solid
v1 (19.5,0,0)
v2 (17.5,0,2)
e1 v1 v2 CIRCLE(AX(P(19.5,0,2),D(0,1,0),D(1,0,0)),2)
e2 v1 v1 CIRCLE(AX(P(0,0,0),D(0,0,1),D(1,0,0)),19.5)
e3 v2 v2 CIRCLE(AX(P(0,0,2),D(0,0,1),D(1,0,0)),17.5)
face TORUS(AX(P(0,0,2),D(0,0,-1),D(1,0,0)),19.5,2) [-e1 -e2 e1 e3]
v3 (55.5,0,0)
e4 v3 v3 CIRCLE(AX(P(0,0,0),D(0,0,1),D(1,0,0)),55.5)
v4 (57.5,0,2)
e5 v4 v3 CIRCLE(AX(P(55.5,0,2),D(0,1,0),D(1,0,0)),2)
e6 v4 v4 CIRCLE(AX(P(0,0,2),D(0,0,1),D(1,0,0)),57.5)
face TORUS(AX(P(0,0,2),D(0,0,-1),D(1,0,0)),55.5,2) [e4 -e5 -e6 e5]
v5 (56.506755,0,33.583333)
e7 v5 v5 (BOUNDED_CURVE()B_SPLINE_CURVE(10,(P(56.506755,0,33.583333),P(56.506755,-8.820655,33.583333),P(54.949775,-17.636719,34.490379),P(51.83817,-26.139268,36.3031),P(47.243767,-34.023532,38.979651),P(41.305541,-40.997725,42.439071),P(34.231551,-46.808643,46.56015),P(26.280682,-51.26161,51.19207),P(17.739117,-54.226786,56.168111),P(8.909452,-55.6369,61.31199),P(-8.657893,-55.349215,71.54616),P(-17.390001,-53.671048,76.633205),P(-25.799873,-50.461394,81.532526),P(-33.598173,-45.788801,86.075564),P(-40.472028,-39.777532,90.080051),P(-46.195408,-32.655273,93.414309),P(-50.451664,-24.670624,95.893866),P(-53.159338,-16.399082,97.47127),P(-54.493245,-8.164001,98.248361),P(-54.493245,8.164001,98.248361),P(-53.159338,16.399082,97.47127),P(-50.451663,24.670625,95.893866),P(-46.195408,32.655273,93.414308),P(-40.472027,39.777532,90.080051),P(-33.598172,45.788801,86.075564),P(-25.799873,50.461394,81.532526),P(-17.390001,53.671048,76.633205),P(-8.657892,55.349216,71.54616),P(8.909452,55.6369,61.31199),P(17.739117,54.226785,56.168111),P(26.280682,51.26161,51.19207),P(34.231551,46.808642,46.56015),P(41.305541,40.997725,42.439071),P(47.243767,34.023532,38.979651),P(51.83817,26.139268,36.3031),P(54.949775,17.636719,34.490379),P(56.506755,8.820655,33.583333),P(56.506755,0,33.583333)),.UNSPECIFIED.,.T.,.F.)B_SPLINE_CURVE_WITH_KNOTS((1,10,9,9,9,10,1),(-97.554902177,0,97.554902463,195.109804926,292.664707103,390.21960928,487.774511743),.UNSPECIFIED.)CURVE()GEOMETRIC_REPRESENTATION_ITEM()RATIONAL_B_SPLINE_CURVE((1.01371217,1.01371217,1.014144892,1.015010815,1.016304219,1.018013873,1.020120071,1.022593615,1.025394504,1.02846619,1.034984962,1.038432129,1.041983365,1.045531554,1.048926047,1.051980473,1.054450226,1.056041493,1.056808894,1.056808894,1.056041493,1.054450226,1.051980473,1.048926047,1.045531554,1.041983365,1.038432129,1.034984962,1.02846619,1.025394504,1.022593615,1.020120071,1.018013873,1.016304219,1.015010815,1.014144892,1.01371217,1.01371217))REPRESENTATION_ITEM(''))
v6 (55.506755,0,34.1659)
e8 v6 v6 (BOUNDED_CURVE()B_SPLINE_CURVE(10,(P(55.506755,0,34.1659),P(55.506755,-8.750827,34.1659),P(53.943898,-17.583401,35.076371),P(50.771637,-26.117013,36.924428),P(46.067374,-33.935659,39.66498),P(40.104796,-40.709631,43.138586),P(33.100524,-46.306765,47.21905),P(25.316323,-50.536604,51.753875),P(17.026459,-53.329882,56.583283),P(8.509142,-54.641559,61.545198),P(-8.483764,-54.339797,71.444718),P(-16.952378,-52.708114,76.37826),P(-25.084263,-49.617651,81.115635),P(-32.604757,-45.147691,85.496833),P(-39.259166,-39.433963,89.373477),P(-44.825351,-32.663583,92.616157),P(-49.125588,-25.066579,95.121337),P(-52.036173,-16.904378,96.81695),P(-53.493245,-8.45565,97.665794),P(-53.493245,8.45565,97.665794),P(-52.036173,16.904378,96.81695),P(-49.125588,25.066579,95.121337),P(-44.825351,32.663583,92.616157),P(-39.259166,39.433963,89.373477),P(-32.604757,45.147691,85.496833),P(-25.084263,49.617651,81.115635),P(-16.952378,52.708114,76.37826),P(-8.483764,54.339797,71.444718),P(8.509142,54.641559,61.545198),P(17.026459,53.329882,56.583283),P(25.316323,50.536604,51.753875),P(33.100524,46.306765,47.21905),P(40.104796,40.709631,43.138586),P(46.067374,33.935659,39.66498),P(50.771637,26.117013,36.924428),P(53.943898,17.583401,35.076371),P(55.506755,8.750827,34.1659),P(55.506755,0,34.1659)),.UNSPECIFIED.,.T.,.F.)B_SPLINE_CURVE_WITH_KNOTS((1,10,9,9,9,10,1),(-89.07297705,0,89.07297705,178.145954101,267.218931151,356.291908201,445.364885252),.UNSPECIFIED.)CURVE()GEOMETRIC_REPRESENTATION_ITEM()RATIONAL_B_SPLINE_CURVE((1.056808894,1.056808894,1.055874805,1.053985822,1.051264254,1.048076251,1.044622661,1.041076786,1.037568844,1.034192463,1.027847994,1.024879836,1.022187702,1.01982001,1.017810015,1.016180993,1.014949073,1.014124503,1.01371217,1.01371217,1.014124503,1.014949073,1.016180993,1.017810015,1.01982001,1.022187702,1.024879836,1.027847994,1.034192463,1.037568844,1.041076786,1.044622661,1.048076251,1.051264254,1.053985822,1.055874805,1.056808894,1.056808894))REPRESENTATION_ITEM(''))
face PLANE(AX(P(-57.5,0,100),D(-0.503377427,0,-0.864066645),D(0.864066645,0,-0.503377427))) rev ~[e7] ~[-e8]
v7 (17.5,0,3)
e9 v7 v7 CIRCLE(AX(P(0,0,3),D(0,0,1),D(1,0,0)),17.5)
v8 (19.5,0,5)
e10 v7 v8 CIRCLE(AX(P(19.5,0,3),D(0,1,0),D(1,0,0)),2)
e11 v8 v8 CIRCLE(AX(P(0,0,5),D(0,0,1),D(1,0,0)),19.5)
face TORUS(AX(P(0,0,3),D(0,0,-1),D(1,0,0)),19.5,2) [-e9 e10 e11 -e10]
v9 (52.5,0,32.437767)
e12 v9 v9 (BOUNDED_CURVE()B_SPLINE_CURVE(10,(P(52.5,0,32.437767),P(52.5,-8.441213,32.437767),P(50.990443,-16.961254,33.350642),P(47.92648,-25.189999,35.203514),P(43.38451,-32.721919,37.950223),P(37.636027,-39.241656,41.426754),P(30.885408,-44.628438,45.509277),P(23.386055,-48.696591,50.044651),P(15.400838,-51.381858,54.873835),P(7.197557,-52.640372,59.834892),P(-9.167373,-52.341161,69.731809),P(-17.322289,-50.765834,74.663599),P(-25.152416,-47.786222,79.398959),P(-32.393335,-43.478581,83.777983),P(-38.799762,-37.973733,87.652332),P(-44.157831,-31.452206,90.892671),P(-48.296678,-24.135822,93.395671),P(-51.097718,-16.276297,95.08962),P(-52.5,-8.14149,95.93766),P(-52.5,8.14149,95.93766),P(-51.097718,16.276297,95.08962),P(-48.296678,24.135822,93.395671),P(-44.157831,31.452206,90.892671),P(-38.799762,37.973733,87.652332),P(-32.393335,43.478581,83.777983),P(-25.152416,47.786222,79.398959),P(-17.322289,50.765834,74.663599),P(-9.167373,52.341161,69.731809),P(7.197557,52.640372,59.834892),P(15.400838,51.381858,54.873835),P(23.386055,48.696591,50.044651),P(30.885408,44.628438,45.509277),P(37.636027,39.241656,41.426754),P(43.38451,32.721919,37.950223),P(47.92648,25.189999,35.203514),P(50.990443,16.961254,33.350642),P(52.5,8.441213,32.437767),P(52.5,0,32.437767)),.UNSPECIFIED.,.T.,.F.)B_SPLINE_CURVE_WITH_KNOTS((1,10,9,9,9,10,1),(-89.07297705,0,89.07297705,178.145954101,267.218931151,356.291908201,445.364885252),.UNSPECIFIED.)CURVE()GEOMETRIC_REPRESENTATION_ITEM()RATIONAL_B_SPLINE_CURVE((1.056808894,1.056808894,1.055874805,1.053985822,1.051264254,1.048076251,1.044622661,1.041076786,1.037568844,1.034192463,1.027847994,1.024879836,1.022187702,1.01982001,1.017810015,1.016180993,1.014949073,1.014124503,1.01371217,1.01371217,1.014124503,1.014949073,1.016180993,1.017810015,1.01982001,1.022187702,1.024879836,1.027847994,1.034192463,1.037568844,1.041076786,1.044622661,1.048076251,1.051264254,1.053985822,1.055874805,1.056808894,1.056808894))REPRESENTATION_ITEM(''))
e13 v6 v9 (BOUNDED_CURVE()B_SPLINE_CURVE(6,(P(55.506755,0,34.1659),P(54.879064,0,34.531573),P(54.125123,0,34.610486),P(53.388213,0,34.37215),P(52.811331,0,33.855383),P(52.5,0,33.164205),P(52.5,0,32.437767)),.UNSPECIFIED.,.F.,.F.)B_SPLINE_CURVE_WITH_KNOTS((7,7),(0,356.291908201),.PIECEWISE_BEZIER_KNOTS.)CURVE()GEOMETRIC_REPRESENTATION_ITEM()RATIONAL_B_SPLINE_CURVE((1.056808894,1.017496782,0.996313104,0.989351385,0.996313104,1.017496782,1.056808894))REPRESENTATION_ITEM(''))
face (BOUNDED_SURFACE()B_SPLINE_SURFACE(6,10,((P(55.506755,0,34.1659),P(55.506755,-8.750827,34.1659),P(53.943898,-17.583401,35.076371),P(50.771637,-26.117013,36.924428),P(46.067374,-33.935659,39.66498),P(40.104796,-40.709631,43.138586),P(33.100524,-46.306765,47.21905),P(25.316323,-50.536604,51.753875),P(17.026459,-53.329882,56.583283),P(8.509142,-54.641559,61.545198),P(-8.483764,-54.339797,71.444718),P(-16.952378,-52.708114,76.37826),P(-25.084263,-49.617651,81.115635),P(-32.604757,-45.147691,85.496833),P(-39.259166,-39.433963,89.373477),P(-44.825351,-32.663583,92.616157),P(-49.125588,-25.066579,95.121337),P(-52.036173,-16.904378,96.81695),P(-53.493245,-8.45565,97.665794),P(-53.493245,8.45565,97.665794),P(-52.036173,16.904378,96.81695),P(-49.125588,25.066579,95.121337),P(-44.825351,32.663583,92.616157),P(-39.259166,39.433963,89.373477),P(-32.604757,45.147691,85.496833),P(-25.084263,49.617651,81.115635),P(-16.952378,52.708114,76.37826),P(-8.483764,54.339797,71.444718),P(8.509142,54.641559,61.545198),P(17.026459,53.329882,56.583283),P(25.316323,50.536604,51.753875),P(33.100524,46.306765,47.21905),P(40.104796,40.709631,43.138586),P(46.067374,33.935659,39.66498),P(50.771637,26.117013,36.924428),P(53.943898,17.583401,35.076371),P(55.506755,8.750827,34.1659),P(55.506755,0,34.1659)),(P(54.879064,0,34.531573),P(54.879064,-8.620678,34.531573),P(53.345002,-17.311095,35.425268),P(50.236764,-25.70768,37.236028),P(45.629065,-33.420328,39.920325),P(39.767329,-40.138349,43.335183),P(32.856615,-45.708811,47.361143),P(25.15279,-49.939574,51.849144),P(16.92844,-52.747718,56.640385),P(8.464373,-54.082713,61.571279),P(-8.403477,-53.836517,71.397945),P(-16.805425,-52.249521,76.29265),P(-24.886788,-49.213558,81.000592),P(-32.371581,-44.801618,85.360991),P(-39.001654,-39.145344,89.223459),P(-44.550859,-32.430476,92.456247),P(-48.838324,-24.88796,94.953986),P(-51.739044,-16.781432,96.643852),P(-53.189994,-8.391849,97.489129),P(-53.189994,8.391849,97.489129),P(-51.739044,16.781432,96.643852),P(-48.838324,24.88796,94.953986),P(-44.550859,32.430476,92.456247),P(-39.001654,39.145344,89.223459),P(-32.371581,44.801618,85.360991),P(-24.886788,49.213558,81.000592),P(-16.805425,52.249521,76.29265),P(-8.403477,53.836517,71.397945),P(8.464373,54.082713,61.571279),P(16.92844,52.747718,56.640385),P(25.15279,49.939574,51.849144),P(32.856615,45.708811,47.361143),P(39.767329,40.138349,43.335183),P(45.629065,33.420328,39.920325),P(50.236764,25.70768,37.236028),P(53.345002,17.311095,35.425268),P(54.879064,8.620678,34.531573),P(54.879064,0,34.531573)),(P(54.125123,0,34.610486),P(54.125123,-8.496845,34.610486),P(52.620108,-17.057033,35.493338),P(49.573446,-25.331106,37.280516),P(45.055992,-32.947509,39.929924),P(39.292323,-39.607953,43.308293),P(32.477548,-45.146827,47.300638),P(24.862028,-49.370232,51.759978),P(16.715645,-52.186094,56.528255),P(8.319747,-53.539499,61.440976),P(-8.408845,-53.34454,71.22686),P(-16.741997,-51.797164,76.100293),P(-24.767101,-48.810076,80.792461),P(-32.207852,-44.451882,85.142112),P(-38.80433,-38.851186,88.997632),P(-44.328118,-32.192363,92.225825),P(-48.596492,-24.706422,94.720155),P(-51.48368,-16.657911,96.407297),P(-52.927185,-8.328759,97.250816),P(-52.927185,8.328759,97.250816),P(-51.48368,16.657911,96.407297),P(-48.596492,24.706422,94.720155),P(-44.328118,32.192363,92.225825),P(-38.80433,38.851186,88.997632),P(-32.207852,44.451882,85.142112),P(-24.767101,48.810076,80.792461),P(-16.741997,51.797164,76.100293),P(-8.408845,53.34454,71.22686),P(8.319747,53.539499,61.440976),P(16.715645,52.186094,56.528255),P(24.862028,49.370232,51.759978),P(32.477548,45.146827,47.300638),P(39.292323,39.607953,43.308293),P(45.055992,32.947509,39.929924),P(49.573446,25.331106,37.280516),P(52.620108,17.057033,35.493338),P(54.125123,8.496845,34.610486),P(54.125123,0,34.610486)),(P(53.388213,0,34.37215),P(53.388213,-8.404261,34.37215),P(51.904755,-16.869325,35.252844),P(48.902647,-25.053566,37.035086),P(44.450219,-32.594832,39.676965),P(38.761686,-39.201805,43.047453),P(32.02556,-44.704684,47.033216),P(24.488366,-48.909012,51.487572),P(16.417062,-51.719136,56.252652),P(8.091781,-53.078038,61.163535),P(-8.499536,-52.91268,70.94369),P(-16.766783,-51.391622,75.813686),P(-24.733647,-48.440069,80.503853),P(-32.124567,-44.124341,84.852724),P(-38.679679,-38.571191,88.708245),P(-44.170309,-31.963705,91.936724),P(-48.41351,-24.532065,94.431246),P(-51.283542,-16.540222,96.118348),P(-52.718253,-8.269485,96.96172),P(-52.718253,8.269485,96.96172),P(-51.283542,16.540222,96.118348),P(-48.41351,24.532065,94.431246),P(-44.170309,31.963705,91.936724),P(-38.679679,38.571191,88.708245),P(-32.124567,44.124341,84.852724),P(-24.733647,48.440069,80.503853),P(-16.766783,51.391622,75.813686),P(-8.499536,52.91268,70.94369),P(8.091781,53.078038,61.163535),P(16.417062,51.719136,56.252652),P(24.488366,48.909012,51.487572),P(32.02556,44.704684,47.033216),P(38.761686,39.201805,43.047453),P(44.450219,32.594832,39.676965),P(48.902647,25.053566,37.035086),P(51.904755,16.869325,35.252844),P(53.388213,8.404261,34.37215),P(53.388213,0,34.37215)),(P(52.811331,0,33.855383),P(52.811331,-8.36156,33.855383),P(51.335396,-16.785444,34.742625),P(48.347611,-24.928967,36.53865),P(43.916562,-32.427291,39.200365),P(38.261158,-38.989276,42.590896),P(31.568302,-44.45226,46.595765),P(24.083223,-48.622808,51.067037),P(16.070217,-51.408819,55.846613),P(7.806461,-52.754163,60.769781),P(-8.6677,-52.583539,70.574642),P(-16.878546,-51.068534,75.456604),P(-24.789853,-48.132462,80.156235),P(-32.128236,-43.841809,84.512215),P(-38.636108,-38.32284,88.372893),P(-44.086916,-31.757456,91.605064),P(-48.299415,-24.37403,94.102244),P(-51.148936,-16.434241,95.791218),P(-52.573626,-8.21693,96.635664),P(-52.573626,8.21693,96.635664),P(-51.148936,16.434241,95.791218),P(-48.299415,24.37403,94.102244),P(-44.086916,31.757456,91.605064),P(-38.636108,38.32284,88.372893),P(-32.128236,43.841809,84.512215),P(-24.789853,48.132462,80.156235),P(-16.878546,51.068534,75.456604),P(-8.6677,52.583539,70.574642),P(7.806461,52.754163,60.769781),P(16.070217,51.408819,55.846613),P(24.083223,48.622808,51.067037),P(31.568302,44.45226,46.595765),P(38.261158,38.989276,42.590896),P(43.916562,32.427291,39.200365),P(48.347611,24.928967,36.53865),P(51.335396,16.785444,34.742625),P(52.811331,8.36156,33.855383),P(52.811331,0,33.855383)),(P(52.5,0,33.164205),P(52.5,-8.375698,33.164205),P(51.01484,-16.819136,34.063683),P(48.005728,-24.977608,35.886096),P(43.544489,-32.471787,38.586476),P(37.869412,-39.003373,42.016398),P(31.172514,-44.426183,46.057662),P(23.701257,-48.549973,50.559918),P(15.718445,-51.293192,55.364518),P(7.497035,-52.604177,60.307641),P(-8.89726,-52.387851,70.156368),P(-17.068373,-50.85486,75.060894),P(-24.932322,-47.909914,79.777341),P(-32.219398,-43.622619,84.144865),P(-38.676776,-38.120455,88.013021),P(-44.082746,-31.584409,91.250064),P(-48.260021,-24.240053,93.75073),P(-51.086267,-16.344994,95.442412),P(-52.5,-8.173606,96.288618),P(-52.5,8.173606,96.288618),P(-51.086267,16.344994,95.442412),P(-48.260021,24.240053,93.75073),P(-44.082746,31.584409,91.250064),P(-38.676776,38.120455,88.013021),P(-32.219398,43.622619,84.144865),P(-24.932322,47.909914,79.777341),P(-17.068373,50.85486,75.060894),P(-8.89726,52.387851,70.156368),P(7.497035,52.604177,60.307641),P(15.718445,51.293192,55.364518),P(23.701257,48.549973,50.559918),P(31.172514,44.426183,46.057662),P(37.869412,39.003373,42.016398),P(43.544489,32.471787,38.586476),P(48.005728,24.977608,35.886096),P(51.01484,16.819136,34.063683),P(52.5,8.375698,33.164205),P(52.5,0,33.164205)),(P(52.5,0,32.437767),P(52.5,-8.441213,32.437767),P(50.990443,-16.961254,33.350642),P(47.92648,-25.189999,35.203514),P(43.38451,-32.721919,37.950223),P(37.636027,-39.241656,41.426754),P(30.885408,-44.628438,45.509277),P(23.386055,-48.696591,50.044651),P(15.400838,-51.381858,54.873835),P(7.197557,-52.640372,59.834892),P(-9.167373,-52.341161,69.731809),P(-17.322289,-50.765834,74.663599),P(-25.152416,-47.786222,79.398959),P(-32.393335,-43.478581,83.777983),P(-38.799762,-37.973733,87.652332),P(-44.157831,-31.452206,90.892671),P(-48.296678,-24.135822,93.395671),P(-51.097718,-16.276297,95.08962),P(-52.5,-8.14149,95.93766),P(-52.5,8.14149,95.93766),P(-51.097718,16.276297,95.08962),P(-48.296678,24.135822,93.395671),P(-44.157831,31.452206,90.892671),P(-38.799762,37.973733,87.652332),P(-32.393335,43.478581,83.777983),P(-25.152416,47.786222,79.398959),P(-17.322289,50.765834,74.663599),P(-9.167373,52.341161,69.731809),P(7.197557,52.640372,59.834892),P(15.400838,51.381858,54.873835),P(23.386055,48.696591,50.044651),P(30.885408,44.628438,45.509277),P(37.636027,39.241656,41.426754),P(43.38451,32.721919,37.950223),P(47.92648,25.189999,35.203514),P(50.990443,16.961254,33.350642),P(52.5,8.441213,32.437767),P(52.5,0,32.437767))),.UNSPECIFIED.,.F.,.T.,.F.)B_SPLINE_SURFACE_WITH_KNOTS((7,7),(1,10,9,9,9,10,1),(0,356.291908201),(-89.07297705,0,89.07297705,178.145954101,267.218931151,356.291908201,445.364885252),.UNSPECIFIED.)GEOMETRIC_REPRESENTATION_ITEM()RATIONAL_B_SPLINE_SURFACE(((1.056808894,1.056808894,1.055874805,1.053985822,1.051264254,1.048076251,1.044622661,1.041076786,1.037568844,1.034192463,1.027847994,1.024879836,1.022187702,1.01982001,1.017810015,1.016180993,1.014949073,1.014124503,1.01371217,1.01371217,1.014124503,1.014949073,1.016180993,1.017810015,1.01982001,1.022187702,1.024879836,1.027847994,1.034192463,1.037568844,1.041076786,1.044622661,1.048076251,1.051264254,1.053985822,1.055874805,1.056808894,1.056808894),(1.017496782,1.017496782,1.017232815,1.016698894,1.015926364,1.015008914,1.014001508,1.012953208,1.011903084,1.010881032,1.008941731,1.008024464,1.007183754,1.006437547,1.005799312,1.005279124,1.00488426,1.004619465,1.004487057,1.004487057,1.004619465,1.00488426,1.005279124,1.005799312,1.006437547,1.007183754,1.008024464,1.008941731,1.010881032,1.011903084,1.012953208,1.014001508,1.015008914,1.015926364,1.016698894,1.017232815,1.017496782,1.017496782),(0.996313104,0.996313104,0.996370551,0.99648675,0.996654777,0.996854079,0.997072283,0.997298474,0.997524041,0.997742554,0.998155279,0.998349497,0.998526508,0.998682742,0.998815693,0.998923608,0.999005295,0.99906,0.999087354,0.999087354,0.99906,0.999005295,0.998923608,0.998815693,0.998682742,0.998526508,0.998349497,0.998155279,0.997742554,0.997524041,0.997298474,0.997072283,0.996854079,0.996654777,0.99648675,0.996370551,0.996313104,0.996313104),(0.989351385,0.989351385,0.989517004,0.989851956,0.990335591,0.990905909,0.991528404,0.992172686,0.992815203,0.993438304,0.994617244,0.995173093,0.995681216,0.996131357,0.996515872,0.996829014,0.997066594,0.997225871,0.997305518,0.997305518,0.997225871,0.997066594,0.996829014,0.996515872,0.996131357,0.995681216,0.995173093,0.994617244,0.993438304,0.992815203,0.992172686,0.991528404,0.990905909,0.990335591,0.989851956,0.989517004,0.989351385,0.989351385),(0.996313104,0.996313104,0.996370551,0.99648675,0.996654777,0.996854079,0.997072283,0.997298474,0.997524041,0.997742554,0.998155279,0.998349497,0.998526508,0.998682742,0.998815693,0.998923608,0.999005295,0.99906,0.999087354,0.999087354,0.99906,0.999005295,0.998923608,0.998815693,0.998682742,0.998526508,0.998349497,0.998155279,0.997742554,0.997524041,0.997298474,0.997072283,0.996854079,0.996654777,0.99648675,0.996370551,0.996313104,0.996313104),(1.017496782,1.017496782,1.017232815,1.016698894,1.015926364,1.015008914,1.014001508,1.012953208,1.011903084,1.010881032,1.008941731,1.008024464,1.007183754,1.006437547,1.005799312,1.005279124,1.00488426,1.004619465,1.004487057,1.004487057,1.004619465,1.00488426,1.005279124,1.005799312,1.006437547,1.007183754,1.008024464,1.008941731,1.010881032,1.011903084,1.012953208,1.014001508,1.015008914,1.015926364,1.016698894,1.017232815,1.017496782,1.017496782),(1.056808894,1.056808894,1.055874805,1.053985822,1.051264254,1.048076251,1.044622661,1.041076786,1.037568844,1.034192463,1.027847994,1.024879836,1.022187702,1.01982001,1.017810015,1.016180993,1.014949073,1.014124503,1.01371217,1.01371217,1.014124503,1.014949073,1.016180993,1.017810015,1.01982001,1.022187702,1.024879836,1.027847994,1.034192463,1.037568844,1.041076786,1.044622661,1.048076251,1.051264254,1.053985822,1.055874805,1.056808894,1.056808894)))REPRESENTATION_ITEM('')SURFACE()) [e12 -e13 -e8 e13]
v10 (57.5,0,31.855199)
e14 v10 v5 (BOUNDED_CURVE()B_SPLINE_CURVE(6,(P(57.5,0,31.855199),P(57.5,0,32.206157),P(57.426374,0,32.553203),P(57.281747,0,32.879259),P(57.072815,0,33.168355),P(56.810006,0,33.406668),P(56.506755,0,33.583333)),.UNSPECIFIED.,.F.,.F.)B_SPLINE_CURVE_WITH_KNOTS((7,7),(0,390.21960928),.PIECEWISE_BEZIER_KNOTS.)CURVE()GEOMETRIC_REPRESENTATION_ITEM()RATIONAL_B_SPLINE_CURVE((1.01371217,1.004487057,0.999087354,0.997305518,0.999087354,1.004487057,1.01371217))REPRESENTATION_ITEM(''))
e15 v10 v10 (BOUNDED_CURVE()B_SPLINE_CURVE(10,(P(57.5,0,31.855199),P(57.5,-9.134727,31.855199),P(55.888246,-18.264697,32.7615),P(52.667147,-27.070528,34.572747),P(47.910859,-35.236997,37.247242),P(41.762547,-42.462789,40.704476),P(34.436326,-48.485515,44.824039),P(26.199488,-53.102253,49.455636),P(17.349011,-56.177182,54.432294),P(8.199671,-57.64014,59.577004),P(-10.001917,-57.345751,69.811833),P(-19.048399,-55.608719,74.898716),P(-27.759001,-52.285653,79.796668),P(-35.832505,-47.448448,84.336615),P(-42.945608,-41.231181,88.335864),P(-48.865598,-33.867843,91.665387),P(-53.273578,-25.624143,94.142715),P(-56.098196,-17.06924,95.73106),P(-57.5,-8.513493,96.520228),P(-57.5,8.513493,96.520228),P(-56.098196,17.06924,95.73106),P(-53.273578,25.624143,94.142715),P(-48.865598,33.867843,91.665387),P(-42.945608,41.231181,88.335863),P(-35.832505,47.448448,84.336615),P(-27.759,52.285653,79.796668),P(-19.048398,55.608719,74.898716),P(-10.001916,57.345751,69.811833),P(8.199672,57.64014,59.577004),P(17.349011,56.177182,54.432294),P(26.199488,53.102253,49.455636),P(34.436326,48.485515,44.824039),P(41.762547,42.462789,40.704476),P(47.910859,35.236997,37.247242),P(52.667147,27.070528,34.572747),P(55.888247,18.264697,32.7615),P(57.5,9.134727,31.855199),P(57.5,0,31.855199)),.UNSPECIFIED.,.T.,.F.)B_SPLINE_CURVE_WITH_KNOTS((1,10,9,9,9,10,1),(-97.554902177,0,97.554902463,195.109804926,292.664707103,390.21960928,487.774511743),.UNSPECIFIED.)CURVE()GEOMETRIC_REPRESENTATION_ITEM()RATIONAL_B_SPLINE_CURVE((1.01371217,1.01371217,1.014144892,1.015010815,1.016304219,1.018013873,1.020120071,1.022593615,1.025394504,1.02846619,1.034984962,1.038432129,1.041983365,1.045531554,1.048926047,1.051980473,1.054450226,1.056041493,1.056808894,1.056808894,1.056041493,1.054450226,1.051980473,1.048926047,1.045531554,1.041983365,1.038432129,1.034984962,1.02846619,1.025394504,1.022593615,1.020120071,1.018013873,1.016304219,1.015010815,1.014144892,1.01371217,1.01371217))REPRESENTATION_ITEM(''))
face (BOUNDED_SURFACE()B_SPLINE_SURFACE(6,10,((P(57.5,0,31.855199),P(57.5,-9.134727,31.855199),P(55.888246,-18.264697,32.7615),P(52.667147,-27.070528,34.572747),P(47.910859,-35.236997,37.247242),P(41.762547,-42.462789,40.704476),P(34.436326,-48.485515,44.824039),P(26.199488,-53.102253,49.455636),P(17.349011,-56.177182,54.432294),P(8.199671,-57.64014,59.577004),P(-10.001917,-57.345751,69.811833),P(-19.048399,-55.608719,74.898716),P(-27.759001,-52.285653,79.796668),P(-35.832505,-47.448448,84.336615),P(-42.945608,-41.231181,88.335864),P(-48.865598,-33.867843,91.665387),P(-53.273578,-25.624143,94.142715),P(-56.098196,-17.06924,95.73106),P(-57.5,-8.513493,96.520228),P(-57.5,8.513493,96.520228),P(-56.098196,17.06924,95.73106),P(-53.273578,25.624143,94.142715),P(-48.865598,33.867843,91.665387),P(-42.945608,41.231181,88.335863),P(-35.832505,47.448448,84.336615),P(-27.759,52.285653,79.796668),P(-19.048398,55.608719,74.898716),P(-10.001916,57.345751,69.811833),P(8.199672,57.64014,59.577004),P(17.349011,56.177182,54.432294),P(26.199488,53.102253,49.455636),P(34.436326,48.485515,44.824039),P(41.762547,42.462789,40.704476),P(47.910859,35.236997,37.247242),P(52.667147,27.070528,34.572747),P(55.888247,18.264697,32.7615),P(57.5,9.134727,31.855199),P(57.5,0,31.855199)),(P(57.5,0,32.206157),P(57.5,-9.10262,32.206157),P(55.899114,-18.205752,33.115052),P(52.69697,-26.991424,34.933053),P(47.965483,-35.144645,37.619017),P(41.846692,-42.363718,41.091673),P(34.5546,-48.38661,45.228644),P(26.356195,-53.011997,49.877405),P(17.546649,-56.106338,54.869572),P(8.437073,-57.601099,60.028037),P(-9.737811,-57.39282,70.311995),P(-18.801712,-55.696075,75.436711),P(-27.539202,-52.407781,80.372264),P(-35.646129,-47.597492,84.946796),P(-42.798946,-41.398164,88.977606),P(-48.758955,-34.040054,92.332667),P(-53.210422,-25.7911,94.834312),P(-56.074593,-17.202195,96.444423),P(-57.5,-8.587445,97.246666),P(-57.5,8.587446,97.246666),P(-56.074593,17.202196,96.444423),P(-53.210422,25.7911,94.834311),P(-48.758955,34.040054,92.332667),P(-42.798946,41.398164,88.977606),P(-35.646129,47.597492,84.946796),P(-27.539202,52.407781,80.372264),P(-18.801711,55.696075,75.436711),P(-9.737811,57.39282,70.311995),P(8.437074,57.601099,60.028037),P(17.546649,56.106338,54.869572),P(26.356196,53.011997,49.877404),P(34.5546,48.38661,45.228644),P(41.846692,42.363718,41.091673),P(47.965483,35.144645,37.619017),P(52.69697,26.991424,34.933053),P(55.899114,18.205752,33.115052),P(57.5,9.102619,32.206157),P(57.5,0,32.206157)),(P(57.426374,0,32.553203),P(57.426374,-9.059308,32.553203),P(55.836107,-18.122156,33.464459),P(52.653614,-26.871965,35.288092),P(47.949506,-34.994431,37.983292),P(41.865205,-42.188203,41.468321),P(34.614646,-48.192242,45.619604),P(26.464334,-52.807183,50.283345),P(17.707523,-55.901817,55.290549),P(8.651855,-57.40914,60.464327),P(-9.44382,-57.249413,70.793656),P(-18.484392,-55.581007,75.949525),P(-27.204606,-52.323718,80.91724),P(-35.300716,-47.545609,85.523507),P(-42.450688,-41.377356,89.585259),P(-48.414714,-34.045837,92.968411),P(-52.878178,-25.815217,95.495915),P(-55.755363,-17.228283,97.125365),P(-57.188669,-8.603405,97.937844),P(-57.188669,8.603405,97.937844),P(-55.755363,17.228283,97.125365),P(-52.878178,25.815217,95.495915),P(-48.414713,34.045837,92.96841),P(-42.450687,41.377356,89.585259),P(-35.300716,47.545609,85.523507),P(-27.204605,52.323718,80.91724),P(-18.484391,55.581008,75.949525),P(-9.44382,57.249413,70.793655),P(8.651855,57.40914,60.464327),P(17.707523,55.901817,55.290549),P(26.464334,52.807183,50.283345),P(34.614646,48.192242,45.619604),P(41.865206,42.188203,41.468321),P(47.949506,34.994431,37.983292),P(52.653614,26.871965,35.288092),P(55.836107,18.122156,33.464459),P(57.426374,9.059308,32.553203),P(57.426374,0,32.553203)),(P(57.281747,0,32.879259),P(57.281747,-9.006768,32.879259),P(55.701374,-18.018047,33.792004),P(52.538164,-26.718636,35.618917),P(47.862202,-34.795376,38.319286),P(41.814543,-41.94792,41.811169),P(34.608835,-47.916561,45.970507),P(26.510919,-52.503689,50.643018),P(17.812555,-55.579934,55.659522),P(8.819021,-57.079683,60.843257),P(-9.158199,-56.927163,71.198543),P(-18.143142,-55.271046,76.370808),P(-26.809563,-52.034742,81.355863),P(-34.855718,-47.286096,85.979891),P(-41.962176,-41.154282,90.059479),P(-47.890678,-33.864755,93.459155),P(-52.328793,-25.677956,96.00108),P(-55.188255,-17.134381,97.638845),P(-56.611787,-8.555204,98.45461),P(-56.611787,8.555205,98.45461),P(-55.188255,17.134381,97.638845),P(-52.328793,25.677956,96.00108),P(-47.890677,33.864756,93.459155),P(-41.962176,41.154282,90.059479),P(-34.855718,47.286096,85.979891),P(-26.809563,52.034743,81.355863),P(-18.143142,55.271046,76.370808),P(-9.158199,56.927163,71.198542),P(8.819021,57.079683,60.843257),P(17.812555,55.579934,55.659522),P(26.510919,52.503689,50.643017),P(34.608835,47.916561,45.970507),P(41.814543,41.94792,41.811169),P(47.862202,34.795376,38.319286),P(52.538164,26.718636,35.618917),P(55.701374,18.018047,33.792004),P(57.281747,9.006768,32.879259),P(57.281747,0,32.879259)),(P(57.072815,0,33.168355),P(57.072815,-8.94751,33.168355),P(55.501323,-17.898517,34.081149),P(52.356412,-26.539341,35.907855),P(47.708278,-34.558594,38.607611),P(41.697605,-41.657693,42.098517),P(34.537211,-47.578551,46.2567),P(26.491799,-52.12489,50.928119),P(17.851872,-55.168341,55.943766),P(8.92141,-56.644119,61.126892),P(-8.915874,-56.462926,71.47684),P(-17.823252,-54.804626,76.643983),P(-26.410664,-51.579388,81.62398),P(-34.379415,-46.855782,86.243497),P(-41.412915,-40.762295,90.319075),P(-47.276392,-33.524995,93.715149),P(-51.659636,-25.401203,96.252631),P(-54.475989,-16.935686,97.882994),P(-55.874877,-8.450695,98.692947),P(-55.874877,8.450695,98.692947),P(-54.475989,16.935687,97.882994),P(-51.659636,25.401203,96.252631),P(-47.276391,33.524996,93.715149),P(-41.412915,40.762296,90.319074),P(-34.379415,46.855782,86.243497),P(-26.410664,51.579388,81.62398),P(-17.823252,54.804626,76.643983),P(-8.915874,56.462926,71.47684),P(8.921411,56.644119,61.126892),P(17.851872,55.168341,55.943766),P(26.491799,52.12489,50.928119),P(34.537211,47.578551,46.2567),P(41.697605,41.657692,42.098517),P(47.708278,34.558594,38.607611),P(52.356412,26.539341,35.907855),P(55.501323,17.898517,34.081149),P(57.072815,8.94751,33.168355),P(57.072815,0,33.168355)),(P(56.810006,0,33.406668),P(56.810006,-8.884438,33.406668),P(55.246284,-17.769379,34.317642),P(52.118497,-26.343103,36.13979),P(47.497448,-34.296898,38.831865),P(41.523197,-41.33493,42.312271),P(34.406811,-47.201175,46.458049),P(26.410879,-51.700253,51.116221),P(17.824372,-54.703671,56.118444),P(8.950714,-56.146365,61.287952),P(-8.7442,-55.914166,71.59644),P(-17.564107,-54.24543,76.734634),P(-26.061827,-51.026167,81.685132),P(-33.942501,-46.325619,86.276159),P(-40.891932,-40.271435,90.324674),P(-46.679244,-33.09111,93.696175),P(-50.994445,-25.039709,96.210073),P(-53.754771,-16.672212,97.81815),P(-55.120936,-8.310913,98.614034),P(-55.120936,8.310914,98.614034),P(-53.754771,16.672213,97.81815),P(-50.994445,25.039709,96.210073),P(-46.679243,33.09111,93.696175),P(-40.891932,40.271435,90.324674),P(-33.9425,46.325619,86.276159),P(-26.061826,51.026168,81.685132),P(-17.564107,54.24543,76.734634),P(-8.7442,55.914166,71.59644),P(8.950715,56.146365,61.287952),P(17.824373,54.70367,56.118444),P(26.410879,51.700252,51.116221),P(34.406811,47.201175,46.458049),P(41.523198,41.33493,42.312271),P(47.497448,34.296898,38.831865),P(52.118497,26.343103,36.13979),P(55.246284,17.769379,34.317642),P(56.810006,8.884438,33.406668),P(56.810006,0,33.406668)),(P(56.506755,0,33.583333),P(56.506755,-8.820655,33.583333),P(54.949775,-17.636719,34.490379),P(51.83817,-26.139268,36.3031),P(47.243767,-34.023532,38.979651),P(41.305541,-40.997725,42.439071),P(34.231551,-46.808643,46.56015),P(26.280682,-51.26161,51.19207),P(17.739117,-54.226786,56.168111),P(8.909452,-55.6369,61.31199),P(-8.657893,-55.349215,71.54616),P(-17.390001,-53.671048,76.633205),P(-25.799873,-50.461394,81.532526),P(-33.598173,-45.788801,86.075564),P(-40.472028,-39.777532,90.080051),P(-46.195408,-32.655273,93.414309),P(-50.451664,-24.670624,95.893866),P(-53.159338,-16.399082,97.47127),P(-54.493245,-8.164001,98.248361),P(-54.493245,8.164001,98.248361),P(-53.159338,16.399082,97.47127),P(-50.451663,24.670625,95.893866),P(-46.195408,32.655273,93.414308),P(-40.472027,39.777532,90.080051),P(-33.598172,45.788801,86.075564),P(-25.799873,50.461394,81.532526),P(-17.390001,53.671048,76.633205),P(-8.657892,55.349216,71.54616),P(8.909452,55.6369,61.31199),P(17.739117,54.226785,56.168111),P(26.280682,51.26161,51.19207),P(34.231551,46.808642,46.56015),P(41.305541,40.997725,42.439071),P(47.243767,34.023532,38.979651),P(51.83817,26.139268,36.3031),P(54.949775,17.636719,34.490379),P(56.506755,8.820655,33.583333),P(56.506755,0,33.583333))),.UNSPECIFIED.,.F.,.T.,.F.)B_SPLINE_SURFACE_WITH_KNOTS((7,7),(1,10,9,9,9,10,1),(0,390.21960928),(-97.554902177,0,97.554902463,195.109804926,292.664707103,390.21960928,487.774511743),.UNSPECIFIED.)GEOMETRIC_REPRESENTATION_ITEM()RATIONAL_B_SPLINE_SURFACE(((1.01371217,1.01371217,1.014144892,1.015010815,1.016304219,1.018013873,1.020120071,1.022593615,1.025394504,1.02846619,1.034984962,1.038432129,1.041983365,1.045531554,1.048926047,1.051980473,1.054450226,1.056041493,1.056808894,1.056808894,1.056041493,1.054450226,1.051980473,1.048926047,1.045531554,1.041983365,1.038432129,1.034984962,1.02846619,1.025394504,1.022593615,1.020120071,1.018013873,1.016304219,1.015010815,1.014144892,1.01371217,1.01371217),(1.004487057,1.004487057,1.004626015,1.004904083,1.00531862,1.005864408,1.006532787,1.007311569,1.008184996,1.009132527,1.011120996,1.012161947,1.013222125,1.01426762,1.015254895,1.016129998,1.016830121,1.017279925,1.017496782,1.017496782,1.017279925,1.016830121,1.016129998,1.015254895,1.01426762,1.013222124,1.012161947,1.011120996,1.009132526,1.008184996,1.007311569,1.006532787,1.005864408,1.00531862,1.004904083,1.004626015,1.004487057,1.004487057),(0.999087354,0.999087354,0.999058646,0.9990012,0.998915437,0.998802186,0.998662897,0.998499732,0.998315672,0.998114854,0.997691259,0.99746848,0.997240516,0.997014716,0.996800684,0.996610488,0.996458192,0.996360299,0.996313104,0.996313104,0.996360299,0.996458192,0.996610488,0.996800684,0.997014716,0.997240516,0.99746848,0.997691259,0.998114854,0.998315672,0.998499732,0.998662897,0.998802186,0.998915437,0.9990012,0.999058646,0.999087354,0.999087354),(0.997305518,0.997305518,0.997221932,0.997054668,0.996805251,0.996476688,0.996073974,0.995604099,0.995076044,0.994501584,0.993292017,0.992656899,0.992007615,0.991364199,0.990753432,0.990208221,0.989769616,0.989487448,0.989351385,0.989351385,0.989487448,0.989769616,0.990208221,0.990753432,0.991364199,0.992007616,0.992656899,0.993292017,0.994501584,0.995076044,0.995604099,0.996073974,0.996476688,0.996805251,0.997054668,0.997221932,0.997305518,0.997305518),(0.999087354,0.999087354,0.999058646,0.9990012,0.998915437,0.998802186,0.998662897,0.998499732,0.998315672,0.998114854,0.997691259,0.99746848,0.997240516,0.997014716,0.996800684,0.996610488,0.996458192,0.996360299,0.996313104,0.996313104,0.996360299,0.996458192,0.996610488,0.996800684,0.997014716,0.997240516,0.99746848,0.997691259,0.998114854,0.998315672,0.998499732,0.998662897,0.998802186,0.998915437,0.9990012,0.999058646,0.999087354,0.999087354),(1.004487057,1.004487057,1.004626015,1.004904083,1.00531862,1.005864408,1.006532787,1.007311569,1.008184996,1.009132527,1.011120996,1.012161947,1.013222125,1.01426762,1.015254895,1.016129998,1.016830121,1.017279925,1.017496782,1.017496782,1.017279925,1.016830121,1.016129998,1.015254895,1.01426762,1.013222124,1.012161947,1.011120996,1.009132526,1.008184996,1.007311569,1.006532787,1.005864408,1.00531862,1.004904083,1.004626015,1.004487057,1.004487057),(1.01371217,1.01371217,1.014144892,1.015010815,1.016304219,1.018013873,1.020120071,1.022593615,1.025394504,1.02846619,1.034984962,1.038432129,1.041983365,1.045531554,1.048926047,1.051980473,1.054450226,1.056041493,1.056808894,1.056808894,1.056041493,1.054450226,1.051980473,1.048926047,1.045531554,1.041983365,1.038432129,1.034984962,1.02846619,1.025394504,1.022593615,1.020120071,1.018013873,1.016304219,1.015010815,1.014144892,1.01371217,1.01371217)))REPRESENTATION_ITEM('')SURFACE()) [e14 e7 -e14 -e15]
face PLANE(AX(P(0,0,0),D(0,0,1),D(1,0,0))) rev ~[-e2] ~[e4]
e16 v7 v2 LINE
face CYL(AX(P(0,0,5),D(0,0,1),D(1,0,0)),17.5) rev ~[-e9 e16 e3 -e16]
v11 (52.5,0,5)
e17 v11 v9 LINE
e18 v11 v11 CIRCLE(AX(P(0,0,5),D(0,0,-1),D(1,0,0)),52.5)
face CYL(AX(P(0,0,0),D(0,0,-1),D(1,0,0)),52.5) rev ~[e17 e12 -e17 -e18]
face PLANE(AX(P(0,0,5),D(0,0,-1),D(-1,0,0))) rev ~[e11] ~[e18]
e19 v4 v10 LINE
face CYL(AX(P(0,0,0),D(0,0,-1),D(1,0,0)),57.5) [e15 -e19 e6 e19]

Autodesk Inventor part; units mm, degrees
ref_plane "YZ Plane" through (0, 0, 0) normal (1, 0, 0) x (0, 1, 0)
ref_plane "XZ Plane" through (0, 0, 0) normal (0, 1, 0) x (-1, 0, 0)
ref_plane "XY Plane" through (0, 0, 0) normal (0, 0, 1) x (1, 0, 0)
sketch "Skizze1" plane through (0, 0, 0) normal (0, 0, 1) x (1, 0, 0)
  circle A0 centre (0, 0) radius 52.5
  circle A1 centre (0, 0) radius 57.5
  dimension "d0" = 105
  dimension "d1" = 5
extrude "Extrusion1" add sketch "Skizze1" along normal blind 100
sketch "Skizze2" plane through (0, 0, 0) normal (0, 0, -1) x (-1, 0, 0)
  circle A0 centre (0, 0) radius 52.5
  dimension "d15" = 105
extrude "Extrusion2" add sketch "Skizze2" against normal blind 5
sketch "Skizze3" plane through (0, 0, 0) normal (0, 1, 0) x (-1, 0, 0)
  line L0 (57.5, 100) -> (-57.5, 100) projected
  line L1 (57.5, 100) -> (-57.5, 33.0047)
  line L2 (-57.5, 0) -> (-57.5, 100) projected
  line L3 (57.5, 100) -> (-57.5, 100)
  line L4 (-57.5, 100) -> (-57.5, 33.0047)
fillet "Rundung2" radius 2 1 edges at (-57.5, 0, 0)
sketch "Skizze4" plane through (0, 0, 5) normal (0, 0, 1) x (1, 0, 0)
  circle A0 centre (0, 0) radius 17.5
  dimension "d10" = 35
extrude "Extrusion4" cut sketch "Skizze4" against normal blind 100
fillet "Rundung3" radius 2 2 edges at (-17.5, 0, 0) (-17.5, 0, 5)
extrude "Extrusion5" cut sketch "Skizze3" along normal through all both and the other way through all
fillet "Rundung5" radius 2 3 edges at (-52.5, 0, 97.0872) (0, -57.5, 66.5024) (0, 57.5, 66.5024)
properties part number "cover"
